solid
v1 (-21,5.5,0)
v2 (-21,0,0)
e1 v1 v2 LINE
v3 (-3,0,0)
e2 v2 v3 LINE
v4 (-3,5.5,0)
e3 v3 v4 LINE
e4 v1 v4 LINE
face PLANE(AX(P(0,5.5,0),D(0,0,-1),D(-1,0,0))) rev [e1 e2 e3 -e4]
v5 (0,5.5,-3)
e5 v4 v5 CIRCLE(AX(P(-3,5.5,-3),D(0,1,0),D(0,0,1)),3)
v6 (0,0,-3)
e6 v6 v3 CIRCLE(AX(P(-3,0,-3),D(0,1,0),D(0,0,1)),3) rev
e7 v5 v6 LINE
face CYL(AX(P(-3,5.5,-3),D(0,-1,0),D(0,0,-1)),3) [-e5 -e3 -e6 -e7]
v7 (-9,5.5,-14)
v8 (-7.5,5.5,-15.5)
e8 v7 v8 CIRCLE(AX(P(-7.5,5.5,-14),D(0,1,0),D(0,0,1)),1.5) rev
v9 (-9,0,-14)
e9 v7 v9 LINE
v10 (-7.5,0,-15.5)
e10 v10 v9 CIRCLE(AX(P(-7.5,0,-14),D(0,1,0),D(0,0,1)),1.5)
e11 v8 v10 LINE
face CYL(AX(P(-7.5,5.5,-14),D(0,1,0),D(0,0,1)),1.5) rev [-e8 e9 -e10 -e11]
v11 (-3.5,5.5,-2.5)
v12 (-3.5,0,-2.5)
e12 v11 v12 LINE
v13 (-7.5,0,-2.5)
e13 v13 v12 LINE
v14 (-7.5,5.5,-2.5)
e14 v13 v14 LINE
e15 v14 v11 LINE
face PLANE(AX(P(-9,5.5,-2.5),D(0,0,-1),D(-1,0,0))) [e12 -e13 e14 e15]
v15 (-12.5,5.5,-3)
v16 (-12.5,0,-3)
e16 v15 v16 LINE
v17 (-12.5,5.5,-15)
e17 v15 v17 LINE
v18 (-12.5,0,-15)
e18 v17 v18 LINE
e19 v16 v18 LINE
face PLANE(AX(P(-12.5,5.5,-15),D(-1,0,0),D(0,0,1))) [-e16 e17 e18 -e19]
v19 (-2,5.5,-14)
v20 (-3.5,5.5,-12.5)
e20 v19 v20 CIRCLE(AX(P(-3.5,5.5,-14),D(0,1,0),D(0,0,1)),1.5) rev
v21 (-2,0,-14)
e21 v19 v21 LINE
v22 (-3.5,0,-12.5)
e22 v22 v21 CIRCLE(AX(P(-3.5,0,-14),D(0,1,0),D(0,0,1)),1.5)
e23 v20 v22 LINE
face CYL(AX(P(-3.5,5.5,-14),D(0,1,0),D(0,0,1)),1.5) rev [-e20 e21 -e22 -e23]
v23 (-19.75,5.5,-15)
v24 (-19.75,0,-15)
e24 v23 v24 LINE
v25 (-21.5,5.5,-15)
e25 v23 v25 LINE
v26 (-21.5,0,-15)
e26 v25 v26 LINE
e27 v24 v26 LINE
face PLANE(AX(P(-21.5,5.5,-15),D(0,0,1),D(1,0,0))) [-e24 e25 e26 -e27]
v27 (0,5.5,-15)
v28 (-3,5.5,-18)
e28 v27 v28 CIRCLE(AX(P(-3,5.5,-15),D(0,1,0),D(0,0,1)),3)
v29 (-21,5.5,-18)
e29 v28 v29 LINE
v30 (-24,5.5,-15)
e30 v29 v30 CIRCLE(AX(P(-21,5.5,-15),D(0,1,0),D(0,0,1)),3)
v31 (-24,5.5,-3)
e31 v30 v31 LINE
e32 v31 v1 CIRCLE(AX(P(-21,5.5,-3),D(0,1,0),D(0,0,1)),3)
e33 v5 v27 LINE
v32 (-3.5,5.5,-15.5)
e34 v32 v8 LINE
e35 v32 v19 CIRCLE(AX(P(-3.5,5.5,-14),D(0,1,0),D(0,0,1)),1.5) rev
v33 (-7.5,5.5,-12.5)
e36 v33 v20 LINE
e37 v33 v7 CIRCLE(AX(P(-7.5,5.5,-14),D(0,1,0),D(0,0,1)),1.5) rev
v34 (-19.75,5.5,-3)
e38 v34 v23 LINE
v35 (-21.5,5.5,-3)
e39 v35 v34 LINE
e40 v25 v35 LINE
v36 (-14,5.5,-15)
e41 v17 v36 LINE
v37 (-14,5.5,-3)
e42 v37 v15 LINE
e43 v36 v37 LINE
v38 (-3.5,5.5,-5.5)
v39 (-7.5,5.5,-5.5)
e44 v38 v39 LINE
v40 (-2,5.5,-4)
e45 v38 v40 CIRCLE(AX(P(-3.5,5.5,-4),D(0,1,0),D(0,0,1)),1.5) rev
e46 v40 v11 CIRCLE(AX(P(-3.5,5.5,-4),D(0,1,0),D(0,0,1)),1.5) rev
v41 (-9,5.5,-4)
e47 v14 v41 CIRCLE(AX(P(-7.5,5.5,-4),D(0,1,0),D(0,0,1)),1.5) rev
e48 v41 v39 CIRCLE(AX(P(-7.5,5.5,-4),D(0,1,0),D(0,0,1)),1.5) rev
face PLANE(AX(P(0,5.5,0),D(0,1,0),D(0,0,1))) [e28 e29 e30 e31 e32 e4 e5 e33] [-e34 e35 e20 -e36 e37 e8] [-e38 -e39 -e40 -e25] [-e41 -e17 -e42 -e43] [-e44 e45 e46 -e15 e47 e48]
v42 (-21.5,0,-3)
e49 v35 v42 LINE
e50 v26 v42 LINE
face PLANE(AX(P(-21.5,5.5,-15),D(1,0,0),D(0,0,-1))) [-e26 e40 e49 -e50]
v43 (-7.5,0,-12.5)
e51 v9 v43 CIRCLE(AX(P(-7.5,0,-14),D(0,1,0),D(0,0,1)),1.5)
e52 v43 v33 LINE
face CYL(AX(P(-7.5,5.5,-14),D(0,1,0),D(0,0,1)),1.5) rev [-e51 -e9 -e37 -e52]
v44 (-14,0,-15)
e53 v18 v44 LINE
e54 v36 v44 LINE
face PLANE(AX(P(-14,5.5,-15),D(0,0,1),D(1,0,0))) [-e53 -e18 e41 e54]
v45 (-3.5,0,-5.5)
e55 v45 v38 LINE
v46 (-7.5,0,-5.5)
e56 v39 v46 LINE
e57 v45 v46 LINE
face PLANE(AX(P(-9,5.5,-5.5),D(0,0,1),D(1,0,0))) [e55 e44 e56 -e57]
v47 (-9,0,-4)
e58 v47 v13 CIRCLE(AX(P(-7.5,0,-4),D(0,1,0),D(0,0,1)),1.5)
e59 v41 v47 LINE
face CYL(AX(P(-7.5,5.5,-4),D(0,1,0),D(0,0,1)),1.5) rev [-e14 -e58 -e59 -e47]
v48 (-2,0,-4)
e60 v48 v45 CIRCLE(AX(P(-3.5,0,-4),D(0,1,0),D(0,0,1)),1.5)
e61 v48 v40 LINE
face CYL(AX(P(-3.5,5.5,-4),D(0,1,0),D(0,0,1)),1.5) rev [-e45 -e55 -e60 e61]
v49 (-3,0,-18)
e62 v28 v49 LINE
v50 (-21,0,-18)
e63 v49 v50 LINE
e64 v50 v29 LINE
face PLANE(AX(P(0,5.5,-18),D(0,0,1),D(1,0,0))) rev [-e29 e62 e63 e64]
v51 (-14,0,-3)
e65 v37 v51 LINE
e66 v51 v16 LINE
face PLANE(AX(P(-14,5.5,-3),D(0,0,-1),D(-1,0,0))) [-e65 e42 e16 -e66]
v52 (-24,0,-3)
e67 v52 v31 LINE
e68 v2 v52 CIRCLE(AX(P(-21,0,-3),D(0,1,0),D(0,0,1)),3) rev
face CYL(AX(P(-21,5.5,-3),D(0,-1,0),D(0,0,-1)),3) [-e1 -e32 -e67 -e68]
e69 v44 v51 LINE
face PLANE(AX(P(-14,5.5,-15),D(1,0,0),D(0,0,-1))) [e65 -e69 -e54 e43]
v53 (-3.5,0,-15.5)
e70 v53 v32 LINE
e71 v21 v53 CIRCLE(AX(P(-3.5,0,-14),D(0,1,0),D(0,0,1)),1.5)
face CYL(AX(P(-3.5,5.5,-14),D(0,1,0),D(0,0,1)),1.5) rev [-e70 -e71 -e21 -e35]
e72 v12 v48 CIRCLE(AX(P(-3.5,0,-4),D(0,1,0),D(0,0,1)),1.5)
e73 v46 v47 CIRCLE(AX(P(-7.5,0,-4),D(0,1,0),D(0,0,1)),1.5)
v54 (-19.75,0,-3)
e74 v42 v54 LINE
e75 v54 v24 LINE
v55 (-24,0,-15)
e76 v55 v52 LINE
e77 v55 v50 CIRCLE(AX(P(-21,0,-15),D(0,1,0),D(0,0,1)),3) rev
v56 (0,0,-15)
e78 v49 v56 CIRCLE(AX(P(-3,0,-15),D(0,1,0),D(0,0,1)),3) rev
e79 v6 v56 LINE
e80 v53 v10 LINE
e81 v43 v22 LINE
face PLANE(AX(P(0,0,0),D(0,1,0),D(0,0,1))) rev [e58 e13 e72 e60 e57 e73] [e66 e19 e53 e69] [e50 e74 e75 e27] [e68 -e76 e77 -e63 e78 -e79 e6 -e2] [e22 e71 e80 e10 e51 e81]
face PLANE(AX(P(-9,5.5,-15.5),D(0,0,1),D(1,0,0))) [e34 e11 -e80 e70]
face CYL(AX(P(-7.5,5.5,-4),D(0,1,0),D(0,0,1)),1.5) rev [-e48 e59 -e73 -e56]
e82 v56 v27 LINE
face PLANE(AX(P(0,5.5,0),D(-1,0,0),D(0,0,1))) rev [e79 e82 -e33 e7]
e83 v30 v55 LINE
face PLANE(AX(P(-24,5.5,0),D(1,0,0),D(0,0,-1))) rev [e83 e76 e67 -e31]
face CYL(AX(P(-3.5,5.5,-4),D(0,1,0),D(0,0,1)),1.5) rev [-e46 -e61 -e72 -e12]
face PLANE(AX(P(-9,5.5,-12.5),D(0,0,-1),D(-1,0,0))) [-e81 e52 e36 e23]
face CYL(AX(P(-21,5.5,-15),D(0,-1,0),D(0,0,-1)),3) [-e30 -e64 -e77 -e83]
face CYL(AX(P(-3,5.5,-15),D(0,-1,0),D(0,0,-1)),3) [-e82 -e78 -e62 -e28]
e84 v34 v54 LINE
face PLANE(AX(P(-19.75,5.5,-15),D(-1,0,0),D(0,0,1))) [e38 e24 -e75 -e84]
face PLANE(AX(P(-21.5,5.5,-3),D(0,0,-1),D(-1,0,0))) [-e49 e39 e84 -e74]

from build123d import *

# Parameters (mm, degrees)
SKETCH1_W           = 24
SKETCH1_H           = 18
SKETCH1_W_2         = 1.5
SKETCH1_H_2         = 12
SKETCH1_W_3         = 1.75
SKETCH1_W_4         = 7
SKETCH1_H_3         = 3
BOSS_EXTRUDE1_DEPTH = 5.5
FILLET1_R           = 3
FILLET2_R           = 3
FILLET4_R           = 1.5
FILLET5_R           = 1.5


with BuildPart() as part:
    # Sketch1 → Boss-Extrude1 (new body)
    with BuildSketch(Plane(origin=(0, 0, 0), x_dir=(1, 0, 0), z_dir=(0, 1, 0))):
        with Locations((-12, 9)):
            Rectangle(SKETCH1_W, SKETCH1_H)
        with Locations((-13.25, 9)):
            Rectangle(SKETCH1_W_2, SKETCH1_H_2, mode=Mode.SUBTRACT)
        with Locations((-20.625, 9)):
            Rectangle(SKETCH1_W_3, SKETCH1_H_2, mode=Mode.SUBTRACT)
        with Locations((-5.5, 14)):
            Rectangle(SKETCH1_W_4, SKETCH1_H_3, mode=Mode.SUBTRACT)
        with Locations((-5.5, 4)):
            Rectangle(SKETCH1_W_4, SKETCH1_H_3, mode=Mode.SUBTRACT)
    extrude(amount=BOSS_EXTRUDE1_DEPTH)

    # Fillet1
    fillet1_edges = [part.edges().sort_by_distance(p)[0] for p in [
        (0, 2.75, 0),
    ]]
    fillet(fillet1_edges, radius=FILLET1_R)

    # Fillet2
    fillet2_edges = [part.edges().sort_by_distance(p)[0] for p in [
        (-24, 2.75, 0),
        (-24, 2.75, -18),
        (0, 2.75, -18),
    ]]
    fillet(fillet2_edges, radius=FILLET2_R)

    # Fillet4
    fillet4_edges = [part.edges().sort_by_distance(p)[0] for p in [
        (-9, 2.75, -15.5),
        (-9, 2.75, -5.5),
        (-9, 2.75, -12.5),
        (-9, 2.75, -2.5),
        (-2, 2.75, -2.5),
    ]]
    fillet(fillet4_edges, radius=FILLET4_R - 0.0001)  # a hair under: the kernel refuses the full size

    # Fillet5
    fillet5_edges = [part.edges().sort_by_distance(p)[0] for p in [
        (-2, 2.75, -12.5),
        (-2, 2.75, -5.5),
        (-2, 2.75, -15.5),
    ]]
    fillet(fillet5_edges, radius=FILLET5_R - 0.0001)  # a hair under: the kernel refuses the full size


solid = part.part
